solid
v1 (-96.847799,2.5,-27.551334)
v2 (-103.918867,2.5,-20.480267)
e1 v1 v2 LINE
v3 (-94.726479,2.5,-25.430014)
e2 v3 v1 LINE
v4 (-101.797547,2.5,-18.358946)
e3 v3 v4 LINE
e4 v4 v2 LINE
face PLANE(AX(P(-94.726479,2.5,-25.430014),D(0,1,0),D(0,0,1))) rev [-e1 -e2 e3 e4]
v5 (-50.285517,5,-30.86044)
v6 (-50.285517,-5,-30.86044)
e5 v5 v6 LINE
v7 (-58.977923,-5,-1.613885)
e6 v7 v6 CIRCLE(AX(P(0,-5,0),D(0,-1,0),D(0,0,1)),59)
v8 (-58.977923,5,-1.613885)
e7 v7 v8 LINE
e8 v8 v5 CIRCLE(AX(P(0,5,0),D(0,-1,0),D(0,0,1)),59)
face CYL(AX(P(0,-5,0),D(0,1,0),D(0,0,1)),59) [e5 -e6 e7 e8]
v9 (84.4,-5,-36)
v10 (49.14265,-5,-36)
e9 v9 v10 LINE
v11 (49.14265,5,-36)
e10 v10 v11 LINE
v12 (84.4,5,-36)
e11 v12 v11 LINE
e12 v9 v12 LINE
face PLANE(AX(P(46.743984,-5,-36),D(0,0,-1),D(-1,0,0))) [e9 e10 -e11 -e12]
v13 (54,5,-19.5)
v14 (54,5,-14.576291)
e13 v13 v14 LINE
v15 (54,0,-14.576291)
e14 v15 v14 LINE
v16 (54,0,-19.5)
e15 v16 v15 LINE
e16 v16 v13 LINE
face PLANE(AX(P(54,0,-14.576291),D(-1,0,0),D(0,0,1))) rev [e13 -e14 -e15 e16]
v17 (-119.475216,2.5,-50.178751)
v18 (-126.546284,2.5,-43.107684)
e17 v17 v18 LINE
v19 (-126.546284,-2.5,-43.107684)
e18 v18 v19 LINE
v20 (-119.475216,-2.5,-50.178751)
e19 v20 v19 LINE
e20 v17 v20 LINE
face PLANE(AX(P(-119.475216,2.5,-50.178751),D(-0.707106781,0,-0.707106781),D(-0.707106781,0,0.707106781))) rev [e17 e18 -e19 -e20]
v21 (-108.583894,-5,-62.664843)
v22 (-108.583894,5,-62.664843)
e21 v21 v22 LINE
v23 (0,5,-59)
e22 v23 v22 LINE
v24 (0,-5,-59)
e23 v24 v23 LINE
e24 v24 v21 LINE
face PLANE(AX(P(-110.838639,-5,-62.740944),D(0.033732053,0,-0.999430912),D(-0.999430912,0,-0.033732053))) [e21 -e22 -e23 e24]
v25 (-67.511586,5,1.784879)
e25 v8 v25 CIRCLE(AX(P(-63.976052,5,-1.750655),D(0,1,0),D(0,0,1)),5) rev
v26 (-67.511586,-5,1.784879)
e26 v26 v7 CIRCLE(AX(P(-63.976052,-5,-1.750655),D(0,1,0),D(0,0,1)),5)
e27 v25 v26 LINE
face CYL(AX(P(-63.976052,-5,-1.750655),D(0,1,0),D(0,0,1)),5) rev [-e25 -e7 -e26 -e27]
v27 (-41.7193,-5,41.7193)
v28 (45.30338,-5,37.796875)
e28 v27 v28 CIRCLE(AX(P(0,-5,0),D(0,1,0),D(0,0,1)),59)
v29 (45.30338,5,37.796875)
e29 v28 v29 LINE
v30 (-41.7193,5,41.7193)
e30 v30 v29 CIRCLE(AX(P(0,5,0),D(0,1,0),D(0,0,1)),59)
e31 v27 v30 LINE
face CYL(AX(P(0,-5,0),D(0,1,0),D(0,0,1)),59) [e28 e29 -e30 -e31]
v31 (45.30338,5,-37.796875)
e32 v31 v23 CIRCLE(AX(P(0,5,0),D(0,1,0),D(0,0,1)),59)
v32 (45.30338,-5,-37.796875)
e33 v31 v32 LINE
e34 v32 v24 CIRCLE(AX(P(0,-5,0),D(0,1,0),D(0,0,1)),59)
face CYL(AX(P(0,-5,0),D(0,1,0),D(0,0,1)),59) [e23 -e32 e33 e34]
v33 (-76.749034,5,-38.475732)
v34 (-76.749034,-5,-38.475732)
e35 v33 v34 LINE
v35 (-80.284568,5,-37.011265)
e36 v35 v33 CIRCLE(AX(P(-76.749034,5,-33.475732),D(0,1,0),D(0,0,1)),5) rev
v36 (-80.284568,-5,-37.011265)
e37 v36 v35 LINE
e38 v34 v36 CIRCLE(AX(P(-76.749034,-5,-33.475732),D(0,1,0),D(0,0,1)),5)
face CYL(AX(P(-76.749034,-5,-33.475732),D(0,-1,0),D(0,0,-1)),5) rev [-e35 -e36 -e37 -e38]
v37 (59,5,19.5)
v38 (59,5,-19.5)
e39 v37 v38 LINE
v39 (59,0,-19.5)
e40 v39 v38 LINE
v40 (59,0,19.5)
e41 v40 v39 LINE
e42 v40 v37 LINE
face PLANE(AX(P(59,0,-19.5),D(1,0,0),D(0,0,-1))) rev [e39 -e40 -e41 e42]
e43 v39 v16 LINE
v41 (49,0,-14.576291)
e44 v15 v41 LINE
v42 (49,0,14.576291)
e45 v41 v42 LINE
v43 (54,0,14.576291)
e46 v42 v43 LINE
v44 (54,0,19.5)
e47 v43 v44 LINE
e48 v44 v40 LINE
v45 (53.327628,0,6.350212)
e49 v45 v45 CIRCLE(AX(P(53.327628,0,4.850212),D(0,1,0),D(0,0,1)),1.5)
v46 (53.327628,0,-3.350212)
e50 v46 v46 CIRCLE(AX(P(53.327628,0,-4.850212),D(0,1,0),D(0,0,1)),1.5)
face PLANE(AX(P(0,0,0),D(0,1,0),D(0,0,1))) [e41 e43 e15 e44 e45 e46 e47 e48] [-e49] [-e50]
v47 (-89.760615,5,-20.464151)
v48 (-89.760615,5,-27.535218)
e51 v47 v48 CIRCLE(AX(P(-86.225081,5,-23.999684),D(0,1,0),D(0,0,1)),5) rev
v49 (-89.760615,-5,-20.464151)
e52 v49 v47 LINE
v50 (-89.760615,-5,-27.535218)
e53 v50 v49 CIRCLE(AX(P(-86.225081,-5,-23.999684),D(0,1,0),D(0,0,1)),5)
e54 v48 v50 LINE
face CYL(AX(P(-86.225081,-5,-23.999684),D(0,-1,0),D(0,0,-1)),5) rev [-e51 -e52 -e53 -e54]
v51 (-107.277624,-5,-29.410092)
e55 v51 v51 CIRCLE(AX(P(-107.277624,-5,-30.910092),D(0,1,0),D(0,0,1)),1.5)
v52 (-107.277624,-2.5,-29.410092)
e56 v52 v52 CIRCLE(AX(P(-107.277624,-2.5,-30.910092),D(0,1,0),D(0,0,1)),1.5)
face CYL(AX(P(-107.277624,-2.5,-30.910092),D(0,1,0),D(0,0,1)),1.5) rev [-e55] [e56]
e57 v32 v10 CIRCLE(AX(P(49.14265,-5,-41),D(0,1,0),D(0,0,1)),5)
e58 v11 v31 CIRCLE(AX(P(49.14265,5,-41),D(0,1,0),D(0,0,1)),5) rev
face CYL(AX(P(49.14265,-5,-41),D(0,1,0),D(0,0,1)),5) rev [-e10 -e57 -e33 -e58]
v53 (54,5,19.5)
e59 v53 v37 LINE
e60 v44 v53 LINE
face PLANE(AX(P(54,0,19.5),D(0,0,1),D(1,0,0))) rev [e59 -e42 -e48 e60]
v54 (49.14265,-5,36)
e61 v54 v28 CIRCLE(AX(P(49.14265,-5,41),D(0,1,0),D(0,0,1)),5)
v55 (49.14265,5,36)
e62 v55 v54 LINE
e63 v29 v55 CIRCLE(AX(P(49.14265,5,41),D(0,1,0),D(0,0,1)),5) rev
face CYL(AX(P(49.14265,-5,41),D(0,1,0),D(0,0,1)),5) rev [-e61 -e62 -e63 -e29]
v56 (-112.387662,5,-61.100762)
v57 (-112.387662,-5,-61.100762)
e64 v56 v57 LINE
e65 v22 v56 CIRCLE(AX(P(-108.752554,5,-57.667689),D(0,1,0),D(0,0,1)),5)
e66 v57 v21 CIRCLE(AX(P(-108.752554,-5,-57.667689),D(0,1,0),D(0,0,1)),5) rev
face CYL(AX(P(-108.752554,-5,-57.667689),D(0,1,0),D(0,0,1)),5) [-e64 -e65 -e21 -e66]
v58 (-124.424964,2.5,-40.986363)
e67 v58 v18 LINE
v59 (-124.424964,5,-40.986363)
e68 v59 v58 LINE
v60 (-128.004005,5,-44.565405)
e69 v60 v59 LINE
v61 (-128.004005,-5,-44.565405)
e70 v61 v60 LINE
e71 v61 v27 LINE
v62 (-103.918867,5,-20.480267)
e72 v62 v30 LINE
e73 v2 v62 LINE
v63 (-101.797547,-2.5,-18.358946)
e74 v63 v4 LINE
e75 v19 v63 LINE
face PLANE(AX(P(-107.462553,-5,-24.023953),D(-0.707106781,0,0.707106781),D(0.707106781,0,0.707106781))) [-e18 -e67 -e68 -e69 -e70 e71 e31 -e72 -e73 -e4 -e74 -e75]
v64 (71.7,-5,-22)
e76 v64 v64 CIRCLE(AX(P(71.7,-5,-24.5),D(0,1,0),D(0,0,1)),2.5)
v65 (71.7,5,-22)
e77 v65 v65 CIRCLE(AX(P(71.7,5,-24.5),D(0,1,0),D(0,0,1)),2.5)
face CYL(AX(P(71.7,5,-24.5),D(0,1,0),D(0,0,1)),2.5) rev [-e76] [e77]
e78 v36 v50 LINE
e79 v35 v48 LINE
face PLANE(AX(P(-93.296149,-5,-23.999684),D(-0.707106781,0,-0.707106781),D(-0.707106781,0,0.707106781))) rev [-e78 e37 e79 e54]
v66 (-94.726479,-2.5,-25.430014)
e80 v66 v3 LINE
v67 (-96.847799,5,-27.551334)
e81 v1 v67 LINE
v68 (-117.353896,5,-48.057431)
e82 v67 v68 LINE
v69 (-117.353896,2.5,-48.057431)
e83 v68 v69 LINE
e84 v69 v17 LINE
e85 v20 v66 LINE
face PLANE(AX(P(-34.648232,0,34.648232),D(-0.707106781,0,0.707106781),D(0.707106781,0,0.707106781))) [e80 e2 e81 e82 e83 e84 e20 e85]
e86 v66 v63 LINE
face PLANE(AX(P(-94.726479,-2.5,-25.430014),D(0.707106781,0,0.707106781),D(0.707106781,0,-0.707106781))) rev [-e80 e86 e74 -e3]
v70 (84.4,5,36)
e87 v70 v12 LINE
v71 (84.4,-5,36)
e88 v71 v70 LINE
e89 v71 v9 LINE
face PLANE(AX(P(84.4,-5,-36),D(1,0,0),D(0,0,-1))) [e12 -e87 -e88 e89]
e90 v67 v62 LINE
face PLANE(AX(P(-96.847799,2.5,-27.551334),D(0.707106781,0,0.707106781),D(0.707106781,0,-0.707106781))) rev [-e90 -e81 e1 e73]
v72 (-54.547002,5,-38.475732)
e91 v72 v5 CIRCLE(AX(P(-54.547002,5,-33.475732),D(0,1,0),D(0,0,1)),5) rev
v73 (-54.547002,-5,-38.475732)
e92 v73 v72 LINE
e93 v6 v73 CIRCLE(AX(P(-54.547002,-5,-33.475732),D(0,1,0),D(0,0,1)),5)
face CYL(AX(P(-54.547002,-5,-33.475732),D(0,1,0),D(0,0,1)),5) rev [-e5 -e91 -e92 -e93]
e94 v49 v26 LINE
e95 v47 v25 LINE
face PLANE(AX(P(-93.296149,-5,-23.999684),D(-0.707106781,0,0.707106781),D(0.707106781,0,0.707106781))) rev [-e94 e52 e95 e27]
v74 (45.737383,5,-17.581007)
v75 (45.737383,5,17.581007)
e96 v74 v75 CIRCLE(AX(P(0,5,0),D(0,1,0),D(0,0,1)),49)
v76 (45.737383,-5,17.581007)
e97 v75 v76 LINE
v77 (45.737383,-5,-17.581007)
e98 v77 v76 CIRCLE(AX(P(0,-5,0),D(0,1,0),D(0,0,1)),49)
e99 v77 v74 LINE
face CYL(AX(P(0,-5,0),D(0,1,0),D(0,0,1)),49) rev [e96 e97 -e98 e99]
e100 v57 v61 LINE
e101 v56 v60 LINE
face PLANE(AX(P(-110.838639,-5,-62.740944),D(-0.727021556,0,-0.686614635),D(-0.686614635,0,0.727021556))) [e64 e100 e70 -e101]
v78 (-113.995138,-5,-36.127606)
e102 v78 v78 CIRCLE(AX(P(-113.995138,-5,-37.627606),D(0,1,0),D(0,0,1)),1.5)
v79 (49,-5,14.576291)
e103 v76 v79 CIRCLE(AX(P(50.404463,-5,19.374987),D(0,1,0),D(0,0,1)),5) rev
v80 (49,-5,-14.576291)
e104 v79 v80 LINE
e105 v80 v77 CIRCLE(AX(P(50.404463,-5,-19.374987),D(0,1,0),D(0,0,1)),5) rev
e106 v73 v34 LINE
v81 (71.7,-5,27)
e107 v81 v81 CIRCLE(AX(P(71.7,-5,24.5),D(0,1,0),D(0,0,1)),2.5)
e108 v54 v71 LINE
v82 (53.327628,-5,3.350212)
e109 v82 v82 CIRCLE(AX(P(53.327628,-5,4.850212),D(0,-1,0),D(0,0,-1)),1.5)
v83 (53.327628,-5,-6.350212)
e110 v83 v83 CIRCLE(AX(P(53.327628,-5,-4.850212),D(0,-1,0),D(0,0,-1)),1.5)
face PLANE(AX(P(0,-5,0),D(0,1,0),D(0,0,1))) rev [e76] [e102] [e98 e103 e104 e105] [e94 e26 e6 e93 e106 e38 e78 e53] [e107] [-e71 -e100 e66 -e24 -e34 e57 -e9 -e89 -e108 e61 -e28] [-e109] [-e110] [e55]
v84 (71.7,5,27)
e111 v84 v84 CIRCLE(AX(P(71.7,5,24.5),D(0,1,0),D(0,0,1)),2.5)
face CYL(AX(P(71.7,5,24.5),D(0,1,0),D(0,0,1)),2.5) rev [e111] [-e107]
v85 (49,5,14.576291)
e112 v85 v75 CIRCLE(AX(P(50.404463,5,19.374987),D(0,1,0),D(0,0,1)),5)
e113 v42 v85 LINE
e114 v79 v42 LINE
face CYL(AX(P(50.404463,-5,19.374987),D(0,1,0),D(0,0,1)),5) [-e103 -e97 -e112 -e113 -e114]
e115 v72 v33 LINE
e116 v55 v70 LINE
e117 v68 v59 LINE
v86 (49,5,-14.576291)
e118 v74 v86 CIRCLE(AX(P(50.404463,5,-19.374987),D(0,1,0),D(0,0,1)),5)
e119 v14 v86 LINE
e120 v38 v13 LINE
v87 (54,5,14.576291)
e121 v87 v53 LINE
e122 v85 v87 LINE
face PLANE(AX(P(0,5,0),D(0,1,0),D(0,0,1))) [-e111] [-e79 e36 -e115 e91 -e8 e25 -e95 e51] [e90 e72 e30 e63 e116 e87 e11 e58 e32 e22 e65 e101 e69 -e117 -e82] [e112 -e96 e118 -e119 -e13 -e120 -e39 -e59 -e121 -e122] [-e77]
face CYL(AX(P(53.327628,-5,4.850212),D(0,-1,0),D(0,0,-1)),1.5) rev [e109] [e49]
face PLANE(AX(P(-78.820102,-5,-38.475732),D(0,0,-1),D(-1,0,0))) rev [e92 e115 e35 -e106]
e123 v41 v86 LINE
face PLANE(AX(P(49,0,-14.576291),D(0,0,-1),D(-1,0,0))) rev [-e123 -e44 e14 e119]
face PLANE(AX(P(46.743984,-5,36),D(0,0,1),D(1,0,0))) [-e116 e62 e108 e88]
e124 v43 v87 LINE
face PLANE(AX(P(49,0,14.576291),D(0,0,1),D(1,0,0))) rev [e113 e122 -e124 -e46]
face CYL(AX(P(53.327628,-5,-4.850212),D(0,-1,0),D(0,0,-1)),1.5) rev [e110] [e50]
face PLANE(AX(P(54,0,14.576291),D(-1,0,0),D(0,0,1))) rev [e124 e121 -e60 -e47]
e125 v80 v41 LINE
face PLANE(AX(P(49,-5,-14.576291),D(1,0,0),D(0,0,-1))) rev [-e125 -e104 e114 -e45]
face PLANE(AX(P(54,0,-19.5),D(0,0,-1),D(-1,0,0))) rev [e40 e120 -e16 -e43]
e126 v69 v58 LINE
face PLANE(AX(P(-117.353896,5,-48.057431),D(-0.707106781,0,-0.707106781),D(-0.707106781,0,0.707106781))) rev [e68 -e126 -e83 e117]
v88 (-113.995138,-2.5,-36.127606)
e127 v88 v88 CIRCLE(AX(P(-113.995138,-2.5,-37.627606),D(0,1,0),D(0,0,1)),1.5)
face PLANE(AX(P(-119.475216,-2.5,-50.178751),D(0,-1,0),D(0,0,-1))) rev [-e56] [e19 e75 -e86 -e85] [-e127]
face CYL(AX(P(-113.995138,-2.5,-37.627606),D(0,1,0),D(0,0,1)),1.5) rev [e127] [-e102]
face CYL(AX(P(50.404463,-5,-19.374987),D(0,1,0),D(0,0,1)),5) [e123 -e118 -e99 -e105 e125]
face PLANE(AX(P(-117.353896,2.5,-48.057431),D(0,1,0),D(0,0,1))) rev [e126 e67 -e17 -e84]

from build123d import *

# Parameters (mm, degrees)
BOSS_EXTRUDE1_DEPTH         = 5
FILLET1_R                   = 5
CUT_EXTRUDE1_DEPTH          = 10
F_3_0MM_DOWEL_HOLE3_D       = 3
CUT_EXTRUDE2_DEPTH          = 5
F_3_0MM_PRESS_DOWEL_HOLE1_D = 3
F_5_0MM_PRESS_DOWEL_HOLE1_D = 5


with BuildPart() as part:
    # Sketch1 → Boss-Extrude1 (new, symmetric)
    with BuildSketch(Plane(origin=(0, 0, 0), x_dir=(1, 0, 0), z_dir=(0, 1, 0))):
        with BuildLine():
            Line((-107.462553071, 24.023952891), (-41.71930009, -41.71930009))
            ThreePointArc((-41.71930009, -41.71930009), (3.806502253, -58.877079926), (46.74398357, -36))
            Line((46.74398357, -36), (84.4, -36))
            Line((84.4, -36), (84.4, 36))
            Line((84.4, 36), (46.74398357, 36))
            ThreePointArc((46.74398357, 36), (26.048032555, 52.93864373), (0, 59))
            Line((0, 59), (-110.83863918, 62.740943777))
            Line((-110.83863918, 62.740943777), (-128.004005064, 44.565404884))
            Line((-128.004005064, 44.565404884), (-107.462553071, 24.023952891))
        make_face()
        with BuildLine():
            Line((49, 14.576290822), (46.781745862, 14.576290822))
            ThreePointArc((46.781745862, 14.576290822), (-49, 0), (46.781745862, -14.576290822))
            Line((46.781745862, -14.576290822), (49, -14.576290822))
            Line((49, -14.576290822), (49, 14.576290822))
        make_face(mode=Mode.SUBTRACT)
        with BuildLine():
            Line((-93.296148974, 23.999684418), (-57.886132355, -11.410332201))
            ThreePointArc((-57.886132355, -11.410332201), (-57.048958802, 15.047135926), (-44.728269399, 38.475731527))
            Line((-44.728269399, 38.475731527), (-78.820101865, 38.475731527))
            Line((-78.820101865, 38.475731527), (-93.296148974, 23.999684418))
        make_face(mode=Mode.SUBTRACT)
    extrude(amount=BOSS_EXTRUDE1_DEPTH, both=True)

    # Fillet1
    # the kernel refuses this fillet: 5 mm, written as the material it adds along each edge
    with BuildSketch(Plane(origin=(46.74398357, -5, 36), x_dir=(1, 0, 0), z_dir=(0, 1, 0))) as fillet1_piece_1:
        with BuildLine():
            CenterArc((2.398665931, -5), FILLET1_R, 90, 50.161560023)
            ThreePointArc((-1.440603561, -1.796875), (-0.711533327, -0.905467408), (0, 0))
            Line((0, 0), (2.398665931, 0))
        make_face()
    extrude(amount=10)
    with BuildSketch(Plane(origin=(46.74398357, -5, -36), x_dir=(-0.6255163967442842, 0, -0.7802110210731757), z_dir=(0, 1, 0))) as fillet1_piece_2:
        with BuildLine():
            CenterArc((2.400650235, -4.999047579), FILLET1_R, 91.118340331, 50.161560023)
            Line((-1.50040487, -1.871465595), (0, 0))
            ThreePointArc((0, 0), (1.151531414, -0.011238567), (2.303062827, 0))
        make_face()
    extrude(amount=10)
    with BuildSketch(Plane(origin=(-93.296148974, -5, -23.999684418), x_dir=(0.7071067811865481, 0, -0.7071067811865468), z_dir=(0, 1, 0))) as fillet1_piece_3:
        with BuildLine():
            CenterArc((FILLET1_R, -FILLET1_R), FILLET1_R, 90, 90)
            Line((0, -FILLET1_R), (0, 0))
            Line((0, 0), (FILLET1_R, 0))
        make_face()
    extrude(amount=10)
    with BuildSketch(Plane(origin=(-78.820101865, -5, -38.475731527), x_dir=(1, 0, 0), z_dir=(0, 1, 0))) as fillet1_piece_4:
        with BuildLine():
            CenterArc((FILLET1_R * 0.414213562373, -FILLET1_R), FILLET1_R, 90, 45)
            Line((-FILLET1_R * 0.292893218813, -FILLET1_R * 0.292893218813), (0, 0))
            Line((0, 0), (FILLET1_R * 0.414213562373, 0))
        make_face()
    extrude(amount=10)
    with BuildSketch(Plane(origin=(-57.886132355, 5, 11.410332201), x_dir=(-0.08353472888006676, 0, -0.9965048665565731), z_dir=(0, -1, 0))) as fillet1_piece_5:
        with BuildLine():
            CenterArc((13.623707644, -4.969234882), FILLET1_R, 96.359234778, 133.432536558)
            Line((10.395870767, -8.787751491), (0, 0))
            ThreePointArc((0, 0), (6.534949195, -0.363028395), (13.06989839, 0))
        make_face()
    extrude(amount=10)
    with BuildSketch(Plane(origin=(-44.728269399, -5, -38.475731527), x_dir=(-0.5894789818981541, 0, 0.807783714802617), z_dir=(0, 1, 0))) as fillet1_piece_6:
        with BuildLine():
            CenterArc((9.826854917, -4.984017175), FILLET1_R, 94.582422839, 121.53762105)
            Line((5.787936343, -7.931412084), (0, 0))
            ThreePointArc((0, 0), (4.713694635, -0.18859734), (9.42738927, 0))
        make_face()
    extrude(amount=10)
    # the kernel refuses this fillet: 5 mm, written as the material it takes off along each edge
    with BuildSketch(Plane(origin=(46.781745862, 12.95259813, 14.576290822), x_dir=(-0.32830869078175484, 0, 0.9445704862831413), z_dir=(0, -1, 0)), Plane(origin=(46.781745862, -12.95259813, -14.576290822), x_dir=(-0.32830869078175745, 0, -0.9445704862831404), z_dir=(0, 1, 0))) as fillet1_2_piece_1:
        with BuildLine():
            CenterArc((3.343337173, -4.997365244), FILLET1_R, 91.860123923, 52.660239811)
            Line((-0.728272112, -2.09529739), (0, 0))
            ThreePointArc((0, 0), (1.590519626, -0.025820606), (3.181039252, 0))
        make_face()
    extrude(amount=25.90519626, mode=Mode.SUBTRACT)
    with BuildSketch(Plane(origin=(-110.83863918, 10.640073082, -62.740943777), x_dir=(-0.6866146353868613, 0, 0.7270215557138366), z_dir=(0, -1, 0))) as fillet1_2_piece_2:
        with BuildLine():
            CenterArc((FILLET1_R * 0.451205846565, -FILLET1_R), FILLET1_R, 90, 48.570349235)
            Line((-FILLET1_R * 0.298562891452, -FILLET1_R * 0.338300038165), (0, 0))
            Line((0, 0), (FILLET1_R * 0.451205846565, 0))
        make_face()
    extrude(amount=21.280146164, mode=Mode.SUBTRACT)

    # Sketch11 → Cut-Extrude1 (cut)
    with BuildSketch(Plane(origin=(-41.71930009, 0, 41.71930009), x_dir=(0.7071067811865458, 0, 0.7071067811865492), z_dir=(-0.7071067811865492, 0, 0.7071067811865458))):
        Polygon((-116.963470882, 5), (-116.963470882, 2.5), (-119.963470882, 2.5), (-119.963470882, -2.5), (-84.963470882, -2.5), (-84.963470882, 2.5), (-87.963470882, 2.5), (-87.963470882, 5), align=None)
    extrude(amount=-CUT_EXTRUDE1_DEPTH, mode=Mode.SUBTRACT)

    # Ø3.0mm Dowel Hole3 (through all)
    with Locations(Plane(origin=(-113.995138479, -2.5, -37.627606111), x_dir=(0, 0, 1), z_dir=(0, 1, 0))):
        with Locations((0, 0), (6.717514421, 6.717514421)):
            Hole(F_3_0MM_DOWEL_HOLE3_D / 2)

    # Sketch33 → Cut-Extrude2 (cut)
    with BuildSketch(Plane(origin=(0, 5, 0), x_dir=(1, 0, 0), z_dir=(0, 1, 0))):
        Polygon((59, 19.5), (59, -19.5), (54, -19.5), (54, -14.576290822), (49, -14.576290822), (49, 14.576290822), (54, 14.576290822), (54, 19.5), align=None)
    extrude(amount=-CUT_EXTRUDE2_DEPTH, mode=Mode.SUBTRACT)

    # Ø3.0mm Press Dowel Hole1 (through all)
    with Locations(Plane(origin=(53.32762779, -5, -4.850211912), x_dir=(0, 0, -1), z_dir=(0, -1, 0))):
        with Locations((0, 0), (-9.700423824, 0)):
            Hole(F_3_0MM_PRESS_DOWEL_HOLE1_D / 2)

    # Ø5.0mm Press Dowel Hole1 (through all)
    with Locations(Plane(origin=(71.7, 5, 24.5), x_dir=(0, 0, 1), z_dir=(0, 1, 0))):
        with Locations((0, 0), (-49, 0)):
            Hole(F_5_0MM_PRESS_DOWEL_HOLE1_D / 2)


solid = part.part
